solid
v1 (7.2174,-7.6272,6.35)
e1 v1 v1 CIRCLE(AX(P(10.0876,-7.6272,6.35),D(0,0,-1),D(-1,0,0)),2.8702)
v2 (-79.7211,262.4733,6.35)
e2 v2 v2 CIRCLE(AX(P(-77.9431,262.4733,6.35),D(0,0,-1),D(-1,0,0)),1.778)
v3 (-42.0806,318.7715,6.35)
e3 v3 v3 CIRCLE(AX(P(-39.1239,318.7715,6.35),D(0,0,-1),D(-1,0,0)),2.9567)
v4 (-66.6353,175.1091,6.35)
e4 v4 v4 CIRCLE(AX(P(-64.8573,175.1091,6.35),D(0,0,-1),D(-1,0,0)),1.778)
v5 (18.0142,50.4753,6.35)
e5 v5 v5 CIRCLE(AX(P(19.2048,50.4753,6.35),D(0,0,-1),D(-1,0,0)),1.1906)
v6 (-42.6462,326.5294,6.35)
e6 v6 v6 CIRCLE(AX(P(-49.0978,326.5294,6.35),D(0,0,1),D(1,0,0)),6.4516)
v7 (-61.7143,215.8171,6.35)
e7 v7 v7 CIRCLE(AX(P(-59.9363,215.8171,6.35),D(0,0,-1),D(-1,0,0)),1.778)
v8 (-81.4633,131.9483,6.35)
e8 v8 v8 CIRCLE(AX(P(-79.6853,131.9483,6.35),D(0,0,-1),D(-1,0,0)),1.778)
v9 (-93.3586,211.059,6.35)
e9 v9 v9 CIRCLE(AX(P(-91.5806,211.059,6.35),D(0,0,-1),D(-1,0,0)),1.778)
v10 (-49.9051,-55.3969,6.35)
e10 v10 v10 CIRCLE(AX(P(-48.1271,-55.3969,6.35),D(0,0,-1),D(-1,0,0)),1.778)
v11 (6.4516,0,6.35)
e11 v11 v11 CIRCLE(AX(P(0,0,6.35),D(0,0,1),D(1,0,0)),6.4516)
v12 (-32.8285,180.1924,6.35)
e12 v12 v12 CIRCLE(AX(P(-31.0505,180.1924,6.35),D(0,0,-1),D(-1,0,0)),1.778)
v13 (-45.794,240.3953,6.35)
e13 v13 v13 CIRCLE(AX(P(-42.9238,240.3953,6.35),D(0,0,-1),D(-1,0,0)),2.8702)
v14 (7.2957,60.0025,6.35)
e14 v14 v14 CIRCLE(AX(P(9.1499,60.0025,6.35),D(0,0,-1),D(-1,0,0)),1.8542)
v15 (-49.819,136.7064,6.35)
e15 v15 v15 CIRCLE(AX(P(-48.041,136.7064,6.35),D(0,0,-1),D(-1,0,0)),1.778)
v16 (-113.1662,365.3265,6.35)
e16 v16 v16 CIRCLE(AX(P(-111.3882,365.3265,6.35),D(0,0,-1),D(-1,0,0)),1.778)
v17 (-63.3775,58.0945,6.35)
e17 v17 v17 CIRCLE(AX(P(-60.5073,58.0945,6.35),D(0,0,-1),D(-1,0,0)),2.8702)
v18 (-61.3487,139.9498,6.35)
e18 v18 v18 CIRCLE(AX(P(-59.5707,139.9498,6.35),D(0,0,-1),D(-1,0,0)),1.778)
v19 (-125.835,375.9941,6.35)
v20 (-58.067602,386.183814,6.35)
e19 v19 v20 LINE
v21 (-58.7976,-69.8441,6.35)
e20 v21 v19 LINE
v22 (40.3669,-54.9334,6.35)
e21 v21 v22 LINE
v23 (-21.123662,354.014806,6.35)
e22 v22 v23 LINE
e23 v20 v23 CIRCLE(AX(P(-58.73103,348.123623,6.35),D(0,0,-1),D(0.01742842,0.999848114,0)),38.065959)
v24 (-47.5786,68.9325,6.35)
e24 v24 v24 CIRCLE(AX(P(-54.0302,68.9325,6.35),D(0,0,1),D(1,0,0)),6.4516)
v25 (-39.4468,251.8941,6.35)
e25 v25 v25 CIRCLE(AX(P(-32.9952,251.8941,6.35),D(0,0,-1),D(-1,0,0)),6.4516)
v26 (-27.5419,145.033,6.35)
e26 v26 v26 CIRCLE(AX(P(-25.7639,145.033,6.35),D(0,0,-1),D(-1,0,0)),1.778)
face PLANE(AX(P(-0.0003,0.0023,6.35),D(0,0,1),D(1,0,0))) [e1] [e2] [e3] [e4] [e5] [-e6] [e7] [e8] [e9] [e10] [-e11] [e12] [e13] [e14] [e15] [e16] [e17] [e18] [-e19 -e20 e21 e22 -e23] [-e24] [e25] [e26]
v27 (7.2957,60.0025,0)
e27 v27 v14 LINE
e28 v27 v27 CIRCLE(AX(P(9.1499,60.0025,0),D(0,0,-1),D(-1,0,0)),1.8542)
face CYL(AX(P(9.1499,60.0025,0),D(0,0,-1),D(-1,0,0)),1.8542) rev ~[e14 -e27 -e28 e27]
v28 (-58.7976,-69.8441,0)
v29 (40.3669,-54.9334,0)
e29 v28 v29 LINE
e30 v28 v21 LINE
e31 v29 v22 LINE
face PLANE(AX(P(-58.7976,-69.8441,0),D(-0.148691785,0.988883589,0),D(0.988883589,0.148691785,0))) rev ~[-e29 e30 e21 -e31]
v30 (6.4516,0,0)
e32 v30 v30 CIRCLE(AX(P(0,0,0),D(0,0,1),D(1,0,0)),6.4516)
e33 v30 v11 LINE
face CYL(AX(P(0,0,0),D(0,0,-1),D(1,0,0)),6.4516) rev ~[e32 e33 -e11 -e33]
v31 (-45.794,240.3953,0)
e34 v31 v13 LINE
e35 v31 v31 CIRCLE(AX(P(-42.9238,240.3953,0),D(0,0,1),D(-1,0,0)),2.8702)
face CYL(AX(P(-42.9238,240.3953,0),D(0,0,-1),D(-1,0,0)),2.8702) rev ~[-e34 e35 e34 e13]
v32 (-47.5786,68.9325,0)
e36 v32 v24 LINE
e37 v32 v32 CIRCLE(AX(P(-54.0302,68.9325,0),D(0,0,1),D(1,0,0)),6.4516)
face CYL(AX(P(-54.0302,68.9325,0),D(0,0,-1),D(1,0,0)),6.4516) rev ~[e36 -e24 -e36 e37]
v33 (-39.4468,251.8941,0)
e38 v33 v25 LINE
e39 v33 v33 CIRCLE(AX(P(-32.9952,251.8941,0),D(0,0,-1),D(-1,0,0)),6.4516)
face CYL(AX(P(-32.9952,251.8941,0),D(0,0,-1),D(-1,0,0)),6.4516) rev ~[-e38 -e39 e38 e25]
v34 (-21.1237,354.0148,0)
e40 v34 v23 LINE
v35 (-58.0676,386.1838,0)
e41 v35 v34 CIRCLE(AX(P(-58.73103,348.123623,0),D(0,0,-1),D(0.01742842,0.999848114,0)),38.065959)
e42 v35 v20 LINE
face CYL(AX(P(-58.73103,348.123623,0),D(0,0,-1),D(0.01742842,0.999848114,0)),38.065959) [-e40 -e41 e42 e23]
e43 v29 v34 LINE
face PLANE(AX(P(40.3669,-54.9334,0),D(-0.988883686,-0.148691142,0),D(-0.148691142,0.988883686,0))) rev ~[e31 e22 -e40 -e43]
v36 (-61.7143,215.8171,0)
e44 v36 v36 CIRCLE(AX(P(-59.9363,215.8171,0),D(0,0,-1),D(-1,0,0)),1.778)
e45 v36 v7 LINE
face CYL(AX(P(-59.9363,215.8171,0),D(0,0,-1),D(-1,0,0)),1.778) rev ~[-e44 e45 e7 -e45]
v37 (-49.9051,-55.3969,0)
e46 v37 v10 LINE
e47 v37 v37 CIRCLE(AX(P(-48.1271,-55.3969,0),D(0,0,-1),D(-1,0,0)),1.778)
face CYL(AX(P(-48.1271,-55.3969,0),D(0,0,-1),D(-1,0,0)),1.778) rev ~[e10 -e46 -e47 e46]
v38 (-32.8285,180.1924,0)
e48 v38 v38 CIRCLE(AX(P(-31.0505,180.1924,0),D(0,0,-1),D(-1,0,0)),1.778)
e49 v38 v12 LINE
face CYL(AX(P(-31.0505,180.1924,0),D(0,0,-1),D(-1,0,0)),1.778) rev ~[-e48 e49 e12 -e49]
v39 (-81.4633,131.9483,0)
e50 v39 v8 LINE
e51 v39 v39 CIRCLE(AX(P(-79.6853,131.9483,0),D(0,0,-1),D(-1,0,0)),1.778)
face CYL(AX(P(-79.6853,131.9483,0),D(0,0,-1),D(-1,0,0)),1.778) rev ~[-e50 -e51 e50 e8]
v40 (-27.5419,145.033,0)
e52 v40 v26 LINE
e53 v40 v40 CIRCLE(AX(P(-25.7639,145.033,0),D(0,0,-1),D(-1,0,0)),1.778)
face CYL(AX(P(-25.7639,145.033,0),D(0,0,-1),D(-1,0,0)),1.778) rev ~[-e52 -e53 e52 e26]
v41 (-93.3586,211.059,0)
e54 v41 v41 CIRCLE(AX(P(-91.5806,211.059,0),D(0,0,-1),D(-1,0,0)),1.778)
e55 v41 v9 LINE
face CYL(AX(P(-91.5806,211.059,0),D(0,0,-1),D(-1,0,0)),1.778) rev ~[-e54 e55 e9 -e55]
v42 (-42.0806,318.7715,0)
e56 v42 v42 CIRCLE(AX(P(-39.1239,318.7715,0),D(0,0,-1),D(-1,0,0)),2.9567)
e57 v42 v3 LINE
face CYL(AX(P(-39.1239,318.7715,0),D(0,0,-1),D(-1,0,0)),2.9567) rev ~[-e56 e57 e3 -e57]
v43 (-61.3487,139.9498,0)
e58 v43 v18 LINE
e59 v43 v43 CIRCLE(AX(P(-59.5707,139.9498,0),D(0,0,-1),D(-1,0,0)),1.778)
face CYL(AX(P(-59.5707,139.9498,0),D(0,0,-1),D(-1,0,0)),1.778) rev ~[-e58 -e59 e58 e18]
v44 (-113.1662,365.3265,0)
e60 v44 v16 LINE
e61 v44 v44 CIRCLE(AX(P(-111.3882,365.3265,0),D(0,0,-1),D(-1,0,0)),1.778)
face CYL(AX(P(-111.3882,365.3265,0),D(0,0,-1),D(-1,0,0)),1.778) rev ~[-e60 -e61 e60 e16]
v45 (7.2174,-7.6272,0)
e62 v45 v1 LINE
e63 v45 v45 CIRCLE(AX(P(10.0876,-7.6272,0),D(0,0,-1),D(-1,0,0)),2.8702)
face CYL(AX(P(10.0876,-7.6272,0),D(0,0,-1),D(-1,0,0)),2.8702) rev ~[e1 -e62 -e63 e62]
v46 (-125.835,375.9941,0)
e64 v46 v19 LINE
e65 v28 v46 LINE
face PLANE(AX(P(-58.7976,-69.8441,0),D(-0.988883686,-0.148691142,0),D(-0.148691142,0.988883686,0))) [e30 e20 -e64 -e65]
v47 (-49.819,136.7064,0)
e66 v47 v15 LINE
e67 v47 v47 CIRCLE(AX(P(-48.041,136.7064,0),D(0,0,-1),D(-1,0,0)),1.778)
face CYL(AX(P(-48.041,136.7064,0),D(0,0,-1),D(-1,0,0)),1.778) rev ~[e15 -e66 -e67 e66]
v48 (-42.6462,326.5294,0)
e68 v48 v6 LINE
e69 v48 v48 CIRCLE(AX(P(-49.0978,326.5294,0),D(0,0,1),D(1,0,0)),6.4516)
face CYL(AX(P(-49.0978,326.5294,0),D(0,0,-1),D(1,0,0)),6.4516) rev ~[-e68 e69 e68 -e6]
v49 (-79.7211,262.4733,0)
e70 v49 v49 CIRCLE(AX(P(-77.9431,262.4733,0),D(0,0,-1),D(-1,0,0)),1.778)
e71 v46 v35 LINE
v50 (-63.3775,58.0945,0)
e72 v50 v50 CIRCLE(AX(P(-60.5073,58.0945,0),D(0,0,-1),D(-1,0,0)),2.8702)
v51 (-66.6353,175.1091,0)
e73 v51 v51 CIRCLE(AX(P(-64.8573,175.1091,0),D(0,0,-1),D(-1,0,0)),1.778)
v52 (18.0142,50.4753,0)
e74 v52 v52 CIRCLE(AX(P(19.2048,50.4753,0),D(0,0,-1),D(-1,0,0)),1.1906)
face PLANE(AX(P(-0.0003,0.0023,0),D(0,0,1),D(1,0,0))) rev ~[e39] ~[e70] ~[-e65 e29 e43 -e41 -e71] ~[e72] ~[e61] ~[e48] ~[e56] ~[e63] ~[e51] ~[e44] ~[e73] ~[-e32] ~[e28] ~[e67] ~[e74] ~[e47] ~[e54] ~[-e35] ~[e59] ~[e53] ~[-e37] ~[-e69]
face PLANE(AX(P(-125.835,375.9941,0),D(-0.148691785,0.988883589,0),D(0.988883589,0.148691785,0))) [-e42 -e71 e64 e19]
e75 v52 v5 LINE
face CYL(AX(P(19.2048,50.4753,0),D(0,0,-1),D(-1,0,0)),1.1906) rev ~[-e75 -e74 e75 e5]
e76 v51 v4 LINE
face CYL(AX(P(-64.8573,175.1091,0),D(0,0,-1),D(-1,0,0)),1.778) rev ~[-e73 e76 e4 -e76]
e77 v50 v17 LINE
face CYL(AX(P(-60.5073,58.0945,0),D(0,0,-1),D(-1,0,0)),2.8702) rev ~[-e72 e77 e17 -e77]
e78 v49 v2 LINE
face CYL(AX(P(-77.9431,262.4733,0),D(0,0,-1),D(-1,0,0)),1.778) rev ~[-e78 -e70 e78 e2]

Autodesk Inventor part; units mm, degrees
ref_plane "YZ Plane" through (0, 0, 0) normal (1, 0, 0) x (0, 1, 0)
ref_plane "XZ Plane" through (0, 0, 0) normal (0, 1, 0) x (-1, 0, 0)
ref_plane "Work Plane1" through (-0.0003, 0.0023, 0) normal (0, 0, 1) x (1, 0, 0)
sketch "Sketch1" plane through (-0.0003, 0.0023, 0) normal (0, 0, 1) x (1, 0, 0)
  circle A0 centre (0.0003, -0.0023) radius 6.3373 construction
  circle A1 centre (-49.0975, 326.5271) radius 6.3373 construction
  circle A2 centre (0.0003, -0.0023) radius 6.4516
  circle A3 centre (-49.0975, 326.5271) radius 6.4516
  circle A4 centre (-49.0975, 326.5271) radius 60.325 construction
  circle A5 centre (0.0003, -0.0023) radius 60.325 construction
  circle A6 centre (0.0003, -0.0023) radius 31.75 construction
  line L0 (40.3672, -54.9357) -> (-26.6702, 390.9025)
  circle A7 centre (-49.0975, 326.5271) radius 31.75 construction
  line L1 (-58.7973, -69.8464) -> (40.3672, -54.9357)
  line L2 (-125.8347, 375.9918) -> (-26.6702, 390.9025)
  circle A8 centre (-54.0299, 68.9302) radius 6.3373 construction
  circle A9 centre (-36.6118, 251.3479) radius 6.3373 construction
  circle A10 centre (-54.0299, 68.9302) radius 6.4516
  line L3 (-82.6344, 131.3852) -> (-87.6899, 165.0073) construction
  line L4 (-58.7973, -69.8464) -> (-125.8347, 375.9918)
  point P0 (0.0003, -0.0023)
  dimension "d0" = 12.9032
  dimension "d3" = 12.9032
  dimension "d11" = 120.65
  dimension "d13" = 120.65
  dimension "d14" = 63.5
  dimension "d16" = 63.5
  dimension "d19" = 12.9032
extrude "Extrusion1" add sketch "Sketch1" along normal blind 6.35
sketch "Sketch2" plane through (-0.0003, 0.0023, 0) normal (0, 0, -1) x (-1, 0, 0)
  circle A0 centre (111.3879, 365.3242) radius 1.778 construction
  circle A1 centre (77.9428, 262.471) radius 1.778 construction
  circle A2 centre (31.0502, 180.1901) radius 1.778 construction
  circle A3 centre (64.857, 175.1068) radius 1.778 construction
  circle A4 centre (25.7636, 145.0307) radius 1.778 construction
  circle A5 centre (59.5704, 139.9475) radius 1.778 construction
  circle A6 centre (48.1268, -55.3992) radius 1.778 construction
  circle A7 centre (111.3879, 365.3242) radius 1.778
  circle A8 centre (77.9428, 262.471) radius 1.778
  circle A9 centre (64.857, 175.1068) radius 1.778
  circle A10 centre (59.5704, 139.9475) radius 1.778
  circle A11 centre (31.0502, 180.1901) radius 1.778
  circle A12 centre (25.7636, 145.0307) radius 1.778
  circle A13 centre (48.1268, -55.3992) radius 1.778
  point P0 (-0.0003, -0.0023)
extrude "Extrusion2" cut sketch "Sketch2" against normal through all
sketch "Sketch3" plane through (-0.0003, 0.0023, 0) normal (0, 0, -1) x (-1, 0, 0)
  circle A0 centre (-7.8664, -5.812) radius 2.8702 construction
  circle A1 centre (58.7683, 60.3758) radius 2.8702 construction
  circle A2 centre (41.3502, 242.7936) radius 2.8702 projected
  circle A3 centre (41.2314, 320.7173) radius 2.8702 construction
  circle A4 centre (39.1236, 318.7692) radius 2.9567
  circle A5 centre (42.9235, 240.393) radius 2.8702
  circle A6 centre (60.507, 58.0922) radius 2.8702
  circle A7 centre (-10.0879, -7.6295) radius 2.8702
  point P0 (-0.0003, -0.0023)
extrude "Extrusion3" cut sketch "Sketch3" against normal through all contours A2 A5 | A2 A5 | A4 | A6 | A7 picked at (41.9477, 242.03) picked at (43.9052, 238.7756)
sketch "Sketch4" plane through (-0.0003, 0.0023, 0) normal (0, 0, -1) x (-1, 0, 0)
  arc A0 (58.0673, 386.1815) -> (21.1234, 354.0125) centre (58.7307, 348.1214) ccw construction
  arc A1 (58.0673, 386.1815) -> (21.1234, 354.0125) centre (58.7307, 348.1214) ccw
  line L0 (26.6702, 390.9025) -> (125.8347, 375.9918) projected
  line L1 (58.0673, 386.1815) -> (26.6702, 390.9025)
  line L2 (26.6702, 390.9025) -> (21.1234, 354.0125)
  point P0 (-0.0003, -0.0023)
extrude "Extrusion4" cut sketch "Sketch4" against normal through all
sketch "Sketch5" plane through (-0.0003, 0.0023, 0) normal (0, 0, -1) x (-1, 0, 0)
  circle A0 centre (-9.1502, 60.0002) radius 2.25 construction
  circle A1 centre (-9.1502, 60.0002) radius 1.8542
  point P0 (-0.0003, -0.0023)
  dimension "d30" = 3.7084
extrude "Extrusion5" cut sketch "Sketch5" against normal through all
sketch "Sketch6" plane through (-0.0003, 0.0023, 0) normal (0, 0, -1) x (-1, 0, 0)
  line L0 (-6.9196, 56.5789) -> (-27.6054, 48.4519) construction
  line L1 (-23.0039, 33.2159) -> (-17.622, 69.0087) construction
  line L2 (-40.3672, -54.9357) -> (21.1234, 354.0125) construction
  circle A0 centre (-19.2051, 50.473) radius 1.1906
  point P0 (-0.0003, -0.0023)
  dimension "d33" = 2.3813
extrude "Extrusion6" cut sketch "Sketch6" against normal through all
sketch "Sketch7" plane through (-0.0003, 0.0023, 0) normal (0, 0, -1) x (-1, 0, 0)
  circle A0 centre (32.9949, 251.8918) radius 6.3373 construction
  circle A1 centre (32.9949, 251.8918) radius 6.4516
  point P0 (-0.0003, -0.0023)
  dimension "d36" = 12.9032
extrude "Extrusion7" cut sketch "Sketch7" against normal through all
sketch "Sketch8" plane through (-0.0003, 0.0023, 0) normal (0, 0, -1) x (-1, 0, 0)
  circle A0 centre (91.5803, 211.0567) radius 3.81 construction
  circle A1 centre (79.685, 131.946) radius 3.81 construction
  circle A2 centre (48.0407, 136.7041) radius 3.81 construction
  circle A3 centre (59.936, 215.8148) radius 3.81 construction
  circle A4 centre (91.5803, 211.0567) radius 1.778
  circle A5 centre (79.685, 131.946) radius 1.778
  circle A6 centre (59.936, 215.8148) radius 1.778
  circle A7 centre (48.0407, 136.7041) radius 1.778
  point P0 (-0.0003, -0.0023)
  dimension "d39" = 3.556
  dimension "d40" = 3.556
  dimension "d41" = 3.556
  dimension "d42" = 3.556
extrude "Extrusion8" cut sketch "Sketch8" against normal through all
equation "\"d0\" = d3"
equation "\"d19\" = d3"
properties part number "inside wall"
